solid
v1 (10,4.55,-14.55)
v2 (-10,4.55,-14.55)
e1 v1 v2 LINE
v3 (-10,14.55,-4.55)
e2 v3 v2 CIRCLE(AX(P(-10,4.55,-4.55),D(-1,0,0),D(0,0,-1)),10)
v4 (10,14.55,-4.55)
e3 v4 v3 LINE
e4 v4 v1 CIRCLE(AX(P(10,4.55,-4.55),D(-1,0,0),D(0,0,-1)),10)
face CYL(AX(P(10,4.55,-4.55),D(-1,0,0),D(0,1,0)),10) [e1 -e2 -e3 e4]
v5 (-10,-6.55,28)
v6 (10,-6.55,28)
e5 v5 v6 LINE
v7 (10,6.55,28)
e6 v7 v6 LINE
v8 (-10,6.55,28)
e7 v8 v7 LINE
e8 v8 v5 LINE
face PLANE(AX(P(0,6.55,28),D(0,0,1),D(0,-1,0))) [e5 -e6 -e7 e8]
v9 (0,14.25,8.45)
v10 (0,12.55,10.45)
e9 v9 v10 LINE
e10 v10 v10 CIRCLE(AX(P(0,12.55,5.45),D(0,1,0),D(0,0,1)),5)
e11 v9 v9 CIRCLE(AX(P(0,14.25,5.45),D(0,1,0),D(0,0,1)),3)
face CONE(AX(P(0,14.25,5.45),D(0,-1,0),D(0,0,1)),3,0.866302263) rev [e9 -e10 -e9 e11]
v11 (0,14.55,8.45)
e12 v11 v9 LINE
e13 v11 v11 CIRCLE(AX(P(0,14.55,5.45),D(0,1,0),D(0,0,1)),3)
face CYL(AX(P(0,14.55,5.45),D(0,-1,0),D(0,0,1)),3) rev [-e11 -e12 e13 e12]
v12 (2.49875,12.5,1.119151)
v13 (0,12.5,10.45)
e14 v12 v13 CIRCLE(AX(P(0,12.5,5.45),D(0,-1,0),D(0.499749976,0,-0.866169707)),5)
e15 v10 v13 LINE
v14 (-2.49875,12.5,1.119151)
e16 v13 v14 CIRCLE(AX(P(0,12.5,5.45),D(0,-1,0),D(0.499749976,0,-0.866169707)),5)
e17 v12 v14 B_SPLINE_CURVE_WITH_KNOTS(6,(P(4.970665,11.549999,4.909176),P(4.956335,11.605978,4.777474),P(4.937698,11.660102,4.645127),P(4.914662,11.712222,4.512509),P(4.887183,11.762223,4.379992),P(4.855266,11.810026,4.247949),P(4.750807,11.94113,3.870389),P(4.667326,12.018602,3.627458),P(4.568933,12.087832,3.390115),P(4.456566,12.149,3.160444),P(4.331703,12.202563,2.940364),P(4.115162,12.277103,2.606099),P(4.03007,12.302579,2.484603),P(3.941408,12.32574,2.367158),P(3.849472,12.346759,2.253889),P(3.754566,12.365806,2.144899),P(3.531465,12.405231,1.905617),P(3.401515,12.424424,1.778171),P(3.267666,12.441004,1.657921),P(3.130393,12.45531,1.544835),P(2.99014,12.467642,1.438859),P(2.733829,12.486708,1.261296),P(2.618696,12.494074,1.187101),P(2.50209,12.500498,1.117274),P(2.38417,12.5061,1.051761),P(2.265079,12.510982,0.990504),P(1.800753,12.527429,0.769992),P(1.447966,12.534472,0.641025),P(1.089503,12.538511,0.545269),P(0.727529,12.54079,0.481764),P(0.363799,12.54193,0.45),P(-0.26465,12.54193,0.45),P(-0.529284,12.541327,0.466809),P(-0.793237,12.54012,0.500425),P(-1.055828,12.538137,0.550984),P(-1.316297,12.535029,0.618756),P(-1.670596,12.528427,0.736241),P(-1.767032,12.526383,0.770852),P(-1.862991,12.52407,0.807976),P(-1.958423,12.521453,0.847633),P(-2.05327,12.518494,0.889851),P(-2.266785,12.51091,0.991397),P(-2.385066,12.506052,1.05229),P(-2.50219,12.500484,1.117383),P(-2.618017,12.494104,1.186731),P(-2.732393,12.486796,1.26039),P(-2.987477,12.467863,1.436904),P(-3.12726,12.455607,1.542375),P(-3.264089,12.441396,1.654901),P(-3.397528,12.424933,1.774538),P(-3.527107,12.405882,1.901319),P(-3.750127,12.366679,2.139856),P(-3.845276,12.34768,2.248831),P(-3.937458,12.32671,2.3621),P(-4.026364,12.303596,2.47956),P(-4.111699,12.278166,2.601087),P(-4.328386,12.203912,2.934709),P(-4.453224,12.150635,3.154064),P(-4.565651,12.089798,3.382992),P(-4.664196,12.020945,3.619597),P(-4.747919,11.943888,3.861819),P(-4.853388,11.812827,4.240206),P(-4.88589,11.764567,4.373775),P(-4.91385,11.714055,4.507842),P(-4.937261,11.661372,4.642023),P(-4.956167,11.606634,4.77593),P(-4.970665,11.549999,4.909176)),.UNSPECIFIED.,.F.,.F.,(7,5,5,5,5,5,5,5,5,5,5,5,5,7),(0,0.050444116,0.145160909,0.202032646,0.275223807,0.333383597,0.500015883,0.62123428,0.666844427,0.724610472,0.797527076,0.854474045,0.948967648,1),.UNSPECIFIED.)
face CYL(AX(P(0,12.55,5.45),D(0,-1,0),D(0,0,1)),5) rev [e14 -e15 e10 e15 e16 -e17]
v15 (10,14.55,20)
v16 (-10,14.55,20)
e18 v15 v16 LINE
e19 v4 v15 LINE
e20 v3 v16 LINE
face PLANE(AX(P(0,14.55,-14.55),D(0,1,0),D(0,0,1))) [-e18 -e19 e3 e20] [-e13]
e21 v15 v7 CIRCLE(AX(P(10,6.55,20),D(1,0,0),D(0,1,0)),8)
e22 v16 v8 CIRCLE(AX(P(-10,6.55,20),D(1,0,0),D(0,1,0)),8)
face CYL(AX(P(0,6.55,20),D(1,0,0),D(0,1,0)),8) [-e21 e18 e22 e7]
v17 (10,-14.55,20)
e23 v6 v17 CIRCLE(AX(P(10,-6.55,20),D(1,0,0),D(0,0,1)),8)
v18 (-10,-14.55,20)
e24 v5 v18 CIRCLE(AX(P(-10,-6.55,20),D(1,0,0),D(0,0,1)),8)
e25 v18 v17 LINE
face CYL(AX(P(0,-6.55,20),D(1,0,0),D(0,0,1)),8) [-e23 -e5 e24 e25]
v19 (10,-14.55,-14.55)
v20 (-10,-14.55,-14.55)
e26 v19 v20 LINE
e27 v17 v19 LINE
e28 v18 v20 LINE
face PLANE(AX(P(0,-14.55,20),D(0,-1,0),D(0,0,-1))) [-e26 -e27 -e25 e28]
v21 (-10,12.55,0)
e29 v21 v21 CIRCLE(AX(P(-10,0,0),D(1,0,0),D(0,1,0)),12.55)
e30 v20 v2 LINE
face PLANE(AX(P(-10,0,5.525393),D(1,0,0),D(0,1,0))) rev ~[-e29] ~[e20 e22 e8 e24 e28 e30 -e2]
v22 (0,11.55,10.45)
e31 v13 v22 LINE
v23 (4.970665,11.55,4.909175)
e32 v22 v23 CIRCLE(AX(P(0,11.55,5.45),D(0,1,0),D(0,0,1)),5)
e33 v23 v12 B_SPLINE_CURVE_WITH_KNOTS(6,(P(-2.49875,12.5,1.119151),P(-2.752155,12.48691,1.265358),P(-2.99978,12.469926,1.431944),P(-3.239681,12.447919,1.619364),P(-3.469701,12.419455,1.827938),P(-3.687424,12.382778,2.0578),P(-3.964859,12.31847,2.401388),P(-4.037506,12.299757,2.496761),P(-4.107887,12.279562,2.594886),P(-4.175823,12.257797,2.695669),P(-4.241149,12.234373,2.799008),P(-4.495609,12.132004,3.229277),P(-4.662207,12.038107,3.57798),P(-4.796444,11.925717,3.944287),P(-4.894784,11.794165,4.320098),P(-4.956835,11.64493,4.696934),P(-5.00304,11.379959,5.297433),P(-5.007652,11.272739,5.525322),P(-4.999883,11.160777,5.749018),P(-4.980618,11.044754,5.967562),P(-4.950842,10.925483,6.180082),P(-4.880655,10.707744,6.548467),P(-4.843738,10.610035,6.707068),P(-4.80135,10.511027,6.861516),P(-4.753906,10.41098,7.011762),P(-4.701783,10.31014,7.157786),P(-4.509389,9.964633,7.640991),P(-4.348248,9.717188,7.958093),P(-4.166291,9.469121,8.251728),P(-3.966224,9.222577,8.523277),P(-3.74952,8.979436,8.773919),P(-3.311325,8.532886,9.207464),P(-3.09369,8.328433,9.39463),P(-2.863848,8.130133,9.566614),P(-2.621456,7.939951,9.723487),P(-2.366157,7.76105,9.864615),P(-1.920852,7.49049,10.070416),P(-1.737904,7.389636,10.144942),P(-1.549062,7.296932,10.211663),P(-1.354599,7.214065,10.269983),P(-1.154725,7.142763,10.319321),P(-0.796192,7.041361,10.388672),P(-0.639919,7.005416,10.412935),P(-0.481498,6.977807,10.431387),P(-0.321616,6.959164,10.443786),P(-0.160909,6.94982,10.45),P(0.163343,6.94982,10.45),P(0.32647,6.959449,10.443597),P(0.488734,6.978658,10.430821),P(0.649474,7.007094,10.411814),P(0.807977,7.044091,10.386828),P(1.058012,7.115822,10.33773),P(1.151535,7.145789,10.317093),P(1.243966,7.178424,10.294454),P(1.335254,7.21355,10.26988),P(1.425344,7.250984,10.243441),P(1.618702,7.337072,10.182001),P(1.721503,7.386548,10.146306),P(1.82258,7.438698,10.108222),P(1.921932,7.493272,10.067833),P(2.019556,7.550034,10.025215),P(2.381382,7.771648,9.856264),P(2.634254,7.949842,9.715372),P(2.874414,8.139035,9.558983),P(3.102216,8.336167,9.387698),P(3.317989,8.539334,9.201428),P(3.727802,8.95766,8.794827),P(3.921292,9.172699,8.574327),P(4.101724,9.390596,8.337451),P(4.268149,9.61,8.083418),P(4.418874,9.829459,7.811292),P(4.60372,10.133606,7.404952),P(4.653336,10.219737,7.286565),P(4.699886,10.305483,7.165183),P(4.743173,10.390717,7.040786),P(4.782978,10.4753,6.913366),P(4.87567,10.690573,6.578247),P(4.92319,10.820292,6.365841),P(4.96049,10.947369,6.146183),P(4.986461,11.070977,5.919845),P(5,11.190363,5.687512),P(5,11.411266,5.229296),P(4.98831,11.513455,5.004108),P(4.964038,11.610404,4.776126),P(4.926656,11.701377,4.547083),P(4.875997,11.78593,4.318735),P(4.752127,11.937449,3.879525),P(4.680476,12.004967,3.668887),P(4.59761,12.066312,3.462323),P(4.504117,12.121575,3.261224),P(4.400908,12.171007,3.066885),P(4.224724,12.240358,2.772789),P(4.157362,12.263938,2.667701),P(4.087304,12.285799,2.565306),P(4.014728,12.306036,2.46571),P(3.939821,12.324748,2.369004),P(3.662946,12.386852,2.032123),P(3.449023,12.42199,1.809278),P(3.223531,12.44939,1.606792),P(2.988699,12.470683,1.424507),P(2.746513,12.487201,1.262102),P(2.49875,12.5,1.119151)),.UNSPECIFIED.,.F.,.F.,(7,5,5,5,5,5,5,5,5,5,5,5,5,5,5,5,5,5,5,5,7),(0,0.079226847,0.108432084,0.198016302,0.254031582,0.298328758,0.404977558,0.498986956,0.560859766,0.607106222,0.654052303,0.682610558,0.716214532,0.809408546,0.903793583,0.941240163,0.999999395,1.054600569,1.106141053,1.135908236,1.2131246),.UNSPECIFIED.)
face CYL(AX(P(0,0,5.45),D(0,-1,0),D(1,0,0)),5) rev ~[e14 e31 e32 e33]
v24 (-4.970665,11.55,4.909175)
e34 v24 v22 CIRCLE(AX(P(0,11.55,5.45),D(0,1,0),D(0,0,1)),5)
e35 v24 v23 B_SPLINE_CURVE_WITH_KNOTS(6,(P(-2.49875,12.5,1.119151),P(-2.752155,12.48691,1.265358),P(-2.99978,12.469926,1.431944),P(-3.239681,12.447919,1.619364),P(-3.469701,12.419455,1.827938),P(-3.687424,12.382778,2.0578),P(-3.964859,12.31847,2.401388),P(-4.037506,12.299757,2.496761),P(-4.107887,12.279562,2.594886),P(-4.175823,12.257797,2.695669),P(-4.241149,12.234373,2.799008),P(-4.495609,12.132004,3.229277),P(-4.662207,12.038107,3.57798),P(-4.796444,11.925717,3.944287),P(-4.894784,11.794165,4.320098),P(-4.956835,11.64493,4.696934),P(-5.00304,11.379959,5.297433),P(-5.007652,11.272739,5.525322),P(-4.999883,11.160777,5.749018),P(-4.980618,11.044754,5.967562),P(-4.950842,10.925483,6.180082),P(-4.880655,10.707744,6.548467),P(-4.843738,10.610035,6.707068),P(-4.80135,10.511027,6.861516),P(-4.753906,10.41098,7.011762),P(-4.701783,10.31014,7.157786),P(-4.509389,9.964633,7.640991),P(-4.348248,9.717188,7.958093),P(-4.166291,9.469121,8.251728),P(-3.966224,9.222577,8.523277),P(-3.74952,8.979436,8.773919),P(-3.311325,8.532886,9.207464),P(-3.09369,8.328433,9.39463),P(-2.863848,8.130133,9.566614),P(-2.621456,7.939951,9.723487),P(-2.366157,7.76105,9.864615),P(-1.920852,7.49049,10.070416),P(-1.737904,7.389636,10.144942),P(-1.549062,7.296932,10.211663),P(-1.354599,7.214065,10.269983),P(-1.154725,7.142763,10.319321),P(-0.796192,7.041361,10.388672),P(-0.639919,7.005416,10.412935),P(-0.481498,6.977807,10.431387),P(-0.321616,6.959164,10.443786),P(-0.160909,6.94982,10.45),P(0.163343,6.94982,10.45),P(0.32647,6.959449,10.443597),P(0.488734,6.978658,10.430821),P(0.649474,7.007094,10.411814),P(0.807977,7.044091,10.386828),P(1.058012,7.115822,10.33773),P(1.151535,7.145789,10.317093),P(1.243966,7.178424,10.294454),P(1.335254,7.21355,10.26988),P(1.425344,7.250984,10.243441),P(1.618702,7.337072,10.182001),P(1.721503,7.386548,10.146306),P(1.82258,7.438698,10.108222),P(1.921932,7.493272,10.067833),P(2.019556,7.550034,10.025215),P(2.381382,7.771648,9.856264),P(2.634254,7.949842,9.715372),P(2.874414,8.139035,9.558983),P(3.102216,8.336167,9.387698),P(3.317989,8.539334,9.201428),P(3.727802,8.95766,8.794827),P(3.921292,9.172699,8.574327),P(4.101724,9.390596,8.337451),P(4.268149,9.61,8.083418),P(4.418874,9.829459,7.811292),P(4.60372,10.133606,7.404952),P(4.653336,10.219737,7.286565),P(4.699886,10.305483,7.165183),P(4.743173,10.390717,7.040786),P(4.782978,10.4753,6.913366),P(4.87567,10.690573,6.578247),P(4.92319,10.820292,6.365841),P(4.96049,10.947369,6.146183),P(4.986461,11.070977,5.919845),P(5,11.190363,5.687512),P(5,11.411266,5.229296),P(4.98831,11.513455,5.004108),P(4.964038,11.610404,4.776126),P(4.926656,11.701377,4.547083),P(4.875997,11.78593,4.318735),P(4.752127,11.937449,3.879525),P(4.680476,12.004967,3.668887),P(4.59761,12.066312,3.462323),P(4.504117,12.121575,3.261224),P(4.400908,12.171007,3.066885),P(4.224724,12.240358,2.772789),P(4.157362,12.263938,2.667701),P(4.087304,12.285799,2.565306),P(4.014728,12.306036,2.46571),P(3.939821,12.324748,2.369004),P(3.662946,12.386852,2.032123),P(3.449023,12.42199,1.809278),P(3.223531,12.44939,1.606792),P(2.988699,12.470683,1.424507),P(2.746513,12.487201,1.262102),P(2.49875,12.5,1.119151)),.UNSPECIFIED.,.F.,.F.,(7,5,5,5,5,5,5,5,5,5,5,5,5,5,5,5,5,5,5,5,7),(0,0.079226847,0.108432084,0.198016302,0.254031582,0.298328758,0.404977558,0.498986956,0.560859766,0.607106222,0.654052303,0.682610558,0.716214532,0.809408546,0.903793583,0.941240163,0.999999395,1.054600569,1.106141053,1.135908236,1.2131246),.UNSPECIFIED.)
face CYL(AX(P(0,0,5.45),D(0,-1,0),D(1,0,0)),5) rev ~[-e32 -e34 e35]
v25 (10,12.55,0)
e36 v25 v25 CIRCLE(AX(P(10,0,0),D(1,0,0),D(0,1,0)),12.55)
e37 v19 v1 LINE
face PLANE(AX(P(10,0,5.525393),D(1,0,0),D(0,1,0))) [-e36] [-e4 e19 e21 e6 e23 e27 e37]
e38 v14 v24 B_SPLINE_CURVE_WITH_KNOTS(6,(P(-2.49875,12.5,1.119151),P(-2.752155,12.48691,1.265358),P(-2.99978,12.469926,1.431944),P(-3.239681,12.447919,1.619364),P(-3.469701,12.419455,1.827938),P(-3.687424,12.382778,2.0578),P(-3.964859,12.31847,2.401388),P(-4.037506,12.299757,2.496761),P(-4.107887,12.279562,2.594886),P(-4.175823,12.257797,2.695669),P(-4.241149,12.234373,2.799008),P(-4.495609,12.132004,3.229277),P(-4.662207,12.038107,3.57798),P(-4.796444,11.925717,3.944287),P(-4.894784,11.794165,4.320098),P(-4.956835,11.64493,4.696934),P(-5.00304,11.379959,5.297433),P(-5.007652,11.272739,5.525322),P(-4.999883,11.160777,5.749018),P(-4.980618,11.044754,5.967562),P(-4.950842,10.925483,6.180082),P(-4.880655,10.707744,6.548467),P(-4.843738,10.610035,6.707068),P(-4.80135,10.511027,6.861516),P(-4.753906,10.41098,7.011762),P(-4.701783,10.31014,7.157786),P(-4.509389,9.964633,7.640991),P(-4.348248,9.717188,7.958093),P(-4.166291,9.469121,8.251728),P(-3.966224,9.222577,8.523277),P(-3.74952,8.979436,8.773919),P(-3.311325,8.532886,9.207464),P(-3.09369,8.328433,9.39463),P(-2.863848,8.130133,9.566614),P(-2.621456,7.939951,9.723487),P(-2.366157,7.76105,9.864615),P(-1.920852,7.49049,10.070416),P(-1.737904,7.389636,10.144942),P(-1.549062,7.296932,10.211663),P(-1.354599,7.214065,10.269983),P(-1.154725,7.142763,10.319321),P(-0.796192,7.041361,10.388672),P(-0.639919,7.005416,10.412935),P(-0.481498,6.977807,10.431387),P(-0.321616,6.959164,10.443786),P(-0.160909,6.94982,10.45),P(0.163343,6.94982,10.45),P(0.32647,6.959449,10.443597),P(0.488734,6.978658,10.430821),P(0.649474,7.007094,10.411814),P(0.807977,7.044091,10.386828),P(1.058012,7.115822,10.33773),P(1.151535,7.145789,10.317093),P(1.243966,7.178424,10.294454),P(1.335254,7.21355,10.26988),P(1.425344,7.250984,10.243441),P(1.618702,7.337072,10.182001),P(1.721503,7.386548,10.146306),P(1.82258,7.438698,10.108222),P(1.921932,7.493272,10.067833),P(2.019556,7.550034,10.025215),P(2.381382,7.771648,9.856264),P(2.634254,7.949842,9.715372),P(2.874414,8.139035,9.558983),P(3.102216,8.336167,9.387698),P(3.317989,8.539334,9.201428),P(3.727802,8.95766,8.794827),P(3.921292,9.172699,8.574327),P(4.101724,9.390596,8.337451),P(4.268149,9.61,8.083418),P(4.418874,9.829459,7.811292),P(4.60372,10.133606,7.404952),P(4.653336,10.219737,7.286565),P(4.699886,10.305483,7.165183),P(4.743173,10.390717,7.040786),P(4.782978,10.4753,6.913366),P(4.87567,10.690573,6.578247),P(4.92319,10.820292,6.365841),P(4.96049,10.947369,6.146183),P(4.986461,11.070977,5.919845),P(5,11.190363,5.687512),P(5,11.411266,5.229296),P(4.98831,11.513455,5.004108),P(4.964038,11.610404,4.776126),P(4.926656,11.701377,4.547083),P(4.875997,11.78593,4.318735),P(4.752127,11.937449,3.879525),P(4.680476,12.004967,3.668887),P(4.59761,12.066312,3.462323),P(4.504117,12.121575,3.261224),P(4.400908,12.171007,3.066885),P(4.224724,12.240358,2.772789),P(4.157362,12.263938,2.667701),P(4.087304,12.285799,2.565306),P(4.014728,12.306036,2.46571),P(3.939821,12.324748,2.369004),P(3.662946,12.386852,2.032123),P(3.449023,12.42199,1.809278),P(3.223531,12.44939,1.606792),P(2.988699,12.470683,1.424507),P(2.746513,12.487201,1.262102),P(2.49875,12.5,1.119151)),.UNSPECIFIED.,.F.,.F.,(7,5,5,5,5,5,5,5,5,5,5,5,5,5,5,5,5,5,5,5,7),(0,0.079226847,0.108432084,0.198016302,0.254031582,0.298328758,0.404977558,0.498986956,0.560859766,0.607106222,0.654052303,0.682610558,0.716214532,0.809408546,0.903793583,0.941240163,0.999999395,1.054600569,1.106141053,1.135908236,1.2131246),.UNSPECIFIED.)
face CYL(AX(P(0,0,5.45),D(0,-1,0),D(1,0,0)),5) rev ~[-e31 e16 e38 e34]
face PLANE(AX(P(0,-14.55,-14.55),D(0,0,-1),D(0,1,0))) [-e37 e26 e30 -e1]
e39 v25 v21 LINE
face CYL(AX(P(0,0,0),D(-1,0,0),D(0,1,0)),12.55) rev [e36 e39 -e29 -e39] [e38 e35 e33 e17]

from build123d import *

# Parameters (mm, degrees)
F0_R     = 12.55
F0_R_2   = 2.75
F0_R_3   = 4
F1_DEPTH = 10
F2_R     = 10
F3_R     = 2.9
F4_DEPTH = 14.551
F3_R_2   = 5
F5_DEPTH = 12.5


with BuildPart() as f1:
    # F0 (on Right) → F1 (new body, symmetric)
    with BuildSketch(Plane.YZ):
        with BuildLine():
            ThreePointArc((14.55, 20), (12.2068542495, 25.6568542495), (6.55, 28))
            Line((6.55, 28), (-6.55, 28))
            ThreePointArc((-6.55, 28), (-12.2068542495, 25.6568542495), (-14.55, 20))
            Line((-14.55, 20), (-14.55, -14.55))
            Line((-14.55, -14.55), (14.55, -14.55))
            Line((14.55, -14.55), (14.55, 20))
        make_face()
        Circle(F0_R, mode=Mode.SUBTRACT)
        with Locations((-6.8404028665, 18.7938524157)):
            Circle(F0_R_2, mode=Mode.SUBTRACT)
        with Locations((6.8404028665, 18.7938524157)):
            Circle(F0_R_3, mode=Mode.SUBTRACT)
        with Locations((6.8404028665, 18.7938524157)):
            Circle(F0_R_3)
        with Locations((-6.8404028665, 18.7938524157)):
            Circle(F0_R_2)
    extrude(amount=F1_DEPTH, both=True)

    # F2
    f2_edges = [f1.edges().sort_by_distance(p)[0] for p in [
        (0, 14.55, -14.55),
    ]]
    fillet(f2_edges, radius=F2_R)

    # F3 (on Front) → F4 (cut, through all)
    with BuildSketch(Plane.XZ):
        with Locations((0, 5.45)):
            Circle(F3_R)
    extrude(amount=-F4_DEPTH, mode=Mode.SUBTRACT)

    # F3 (on Front) → F5 (cut)
    with BuildSketch(Plane.XZ):
        with Locations((0, 5.45)):
            Circle(F3_R_2)
        with Locations((0, 5.45)):
            Circle(F3_R, mode=Mode.SUBTRACT)
    extrude(amount=-F5_DEPTH, mode=Mode.SUBTRACT)

    # F6 (on Right) → F7 (revolve, cut)
    with BuildSketch(Plane.YZ):
        Polygon((14.55, 5.45), (14.55, 8.45), (14.25, 8.45), (12.55, 10.45), (11.55, 10.45), (11.55, 5.45), align=None)
    revolve(axis=Axis((0, 7.275, 5.45), (0, 1, 0)), mode=Mode.SUBTRACT)


solid = f1.part
